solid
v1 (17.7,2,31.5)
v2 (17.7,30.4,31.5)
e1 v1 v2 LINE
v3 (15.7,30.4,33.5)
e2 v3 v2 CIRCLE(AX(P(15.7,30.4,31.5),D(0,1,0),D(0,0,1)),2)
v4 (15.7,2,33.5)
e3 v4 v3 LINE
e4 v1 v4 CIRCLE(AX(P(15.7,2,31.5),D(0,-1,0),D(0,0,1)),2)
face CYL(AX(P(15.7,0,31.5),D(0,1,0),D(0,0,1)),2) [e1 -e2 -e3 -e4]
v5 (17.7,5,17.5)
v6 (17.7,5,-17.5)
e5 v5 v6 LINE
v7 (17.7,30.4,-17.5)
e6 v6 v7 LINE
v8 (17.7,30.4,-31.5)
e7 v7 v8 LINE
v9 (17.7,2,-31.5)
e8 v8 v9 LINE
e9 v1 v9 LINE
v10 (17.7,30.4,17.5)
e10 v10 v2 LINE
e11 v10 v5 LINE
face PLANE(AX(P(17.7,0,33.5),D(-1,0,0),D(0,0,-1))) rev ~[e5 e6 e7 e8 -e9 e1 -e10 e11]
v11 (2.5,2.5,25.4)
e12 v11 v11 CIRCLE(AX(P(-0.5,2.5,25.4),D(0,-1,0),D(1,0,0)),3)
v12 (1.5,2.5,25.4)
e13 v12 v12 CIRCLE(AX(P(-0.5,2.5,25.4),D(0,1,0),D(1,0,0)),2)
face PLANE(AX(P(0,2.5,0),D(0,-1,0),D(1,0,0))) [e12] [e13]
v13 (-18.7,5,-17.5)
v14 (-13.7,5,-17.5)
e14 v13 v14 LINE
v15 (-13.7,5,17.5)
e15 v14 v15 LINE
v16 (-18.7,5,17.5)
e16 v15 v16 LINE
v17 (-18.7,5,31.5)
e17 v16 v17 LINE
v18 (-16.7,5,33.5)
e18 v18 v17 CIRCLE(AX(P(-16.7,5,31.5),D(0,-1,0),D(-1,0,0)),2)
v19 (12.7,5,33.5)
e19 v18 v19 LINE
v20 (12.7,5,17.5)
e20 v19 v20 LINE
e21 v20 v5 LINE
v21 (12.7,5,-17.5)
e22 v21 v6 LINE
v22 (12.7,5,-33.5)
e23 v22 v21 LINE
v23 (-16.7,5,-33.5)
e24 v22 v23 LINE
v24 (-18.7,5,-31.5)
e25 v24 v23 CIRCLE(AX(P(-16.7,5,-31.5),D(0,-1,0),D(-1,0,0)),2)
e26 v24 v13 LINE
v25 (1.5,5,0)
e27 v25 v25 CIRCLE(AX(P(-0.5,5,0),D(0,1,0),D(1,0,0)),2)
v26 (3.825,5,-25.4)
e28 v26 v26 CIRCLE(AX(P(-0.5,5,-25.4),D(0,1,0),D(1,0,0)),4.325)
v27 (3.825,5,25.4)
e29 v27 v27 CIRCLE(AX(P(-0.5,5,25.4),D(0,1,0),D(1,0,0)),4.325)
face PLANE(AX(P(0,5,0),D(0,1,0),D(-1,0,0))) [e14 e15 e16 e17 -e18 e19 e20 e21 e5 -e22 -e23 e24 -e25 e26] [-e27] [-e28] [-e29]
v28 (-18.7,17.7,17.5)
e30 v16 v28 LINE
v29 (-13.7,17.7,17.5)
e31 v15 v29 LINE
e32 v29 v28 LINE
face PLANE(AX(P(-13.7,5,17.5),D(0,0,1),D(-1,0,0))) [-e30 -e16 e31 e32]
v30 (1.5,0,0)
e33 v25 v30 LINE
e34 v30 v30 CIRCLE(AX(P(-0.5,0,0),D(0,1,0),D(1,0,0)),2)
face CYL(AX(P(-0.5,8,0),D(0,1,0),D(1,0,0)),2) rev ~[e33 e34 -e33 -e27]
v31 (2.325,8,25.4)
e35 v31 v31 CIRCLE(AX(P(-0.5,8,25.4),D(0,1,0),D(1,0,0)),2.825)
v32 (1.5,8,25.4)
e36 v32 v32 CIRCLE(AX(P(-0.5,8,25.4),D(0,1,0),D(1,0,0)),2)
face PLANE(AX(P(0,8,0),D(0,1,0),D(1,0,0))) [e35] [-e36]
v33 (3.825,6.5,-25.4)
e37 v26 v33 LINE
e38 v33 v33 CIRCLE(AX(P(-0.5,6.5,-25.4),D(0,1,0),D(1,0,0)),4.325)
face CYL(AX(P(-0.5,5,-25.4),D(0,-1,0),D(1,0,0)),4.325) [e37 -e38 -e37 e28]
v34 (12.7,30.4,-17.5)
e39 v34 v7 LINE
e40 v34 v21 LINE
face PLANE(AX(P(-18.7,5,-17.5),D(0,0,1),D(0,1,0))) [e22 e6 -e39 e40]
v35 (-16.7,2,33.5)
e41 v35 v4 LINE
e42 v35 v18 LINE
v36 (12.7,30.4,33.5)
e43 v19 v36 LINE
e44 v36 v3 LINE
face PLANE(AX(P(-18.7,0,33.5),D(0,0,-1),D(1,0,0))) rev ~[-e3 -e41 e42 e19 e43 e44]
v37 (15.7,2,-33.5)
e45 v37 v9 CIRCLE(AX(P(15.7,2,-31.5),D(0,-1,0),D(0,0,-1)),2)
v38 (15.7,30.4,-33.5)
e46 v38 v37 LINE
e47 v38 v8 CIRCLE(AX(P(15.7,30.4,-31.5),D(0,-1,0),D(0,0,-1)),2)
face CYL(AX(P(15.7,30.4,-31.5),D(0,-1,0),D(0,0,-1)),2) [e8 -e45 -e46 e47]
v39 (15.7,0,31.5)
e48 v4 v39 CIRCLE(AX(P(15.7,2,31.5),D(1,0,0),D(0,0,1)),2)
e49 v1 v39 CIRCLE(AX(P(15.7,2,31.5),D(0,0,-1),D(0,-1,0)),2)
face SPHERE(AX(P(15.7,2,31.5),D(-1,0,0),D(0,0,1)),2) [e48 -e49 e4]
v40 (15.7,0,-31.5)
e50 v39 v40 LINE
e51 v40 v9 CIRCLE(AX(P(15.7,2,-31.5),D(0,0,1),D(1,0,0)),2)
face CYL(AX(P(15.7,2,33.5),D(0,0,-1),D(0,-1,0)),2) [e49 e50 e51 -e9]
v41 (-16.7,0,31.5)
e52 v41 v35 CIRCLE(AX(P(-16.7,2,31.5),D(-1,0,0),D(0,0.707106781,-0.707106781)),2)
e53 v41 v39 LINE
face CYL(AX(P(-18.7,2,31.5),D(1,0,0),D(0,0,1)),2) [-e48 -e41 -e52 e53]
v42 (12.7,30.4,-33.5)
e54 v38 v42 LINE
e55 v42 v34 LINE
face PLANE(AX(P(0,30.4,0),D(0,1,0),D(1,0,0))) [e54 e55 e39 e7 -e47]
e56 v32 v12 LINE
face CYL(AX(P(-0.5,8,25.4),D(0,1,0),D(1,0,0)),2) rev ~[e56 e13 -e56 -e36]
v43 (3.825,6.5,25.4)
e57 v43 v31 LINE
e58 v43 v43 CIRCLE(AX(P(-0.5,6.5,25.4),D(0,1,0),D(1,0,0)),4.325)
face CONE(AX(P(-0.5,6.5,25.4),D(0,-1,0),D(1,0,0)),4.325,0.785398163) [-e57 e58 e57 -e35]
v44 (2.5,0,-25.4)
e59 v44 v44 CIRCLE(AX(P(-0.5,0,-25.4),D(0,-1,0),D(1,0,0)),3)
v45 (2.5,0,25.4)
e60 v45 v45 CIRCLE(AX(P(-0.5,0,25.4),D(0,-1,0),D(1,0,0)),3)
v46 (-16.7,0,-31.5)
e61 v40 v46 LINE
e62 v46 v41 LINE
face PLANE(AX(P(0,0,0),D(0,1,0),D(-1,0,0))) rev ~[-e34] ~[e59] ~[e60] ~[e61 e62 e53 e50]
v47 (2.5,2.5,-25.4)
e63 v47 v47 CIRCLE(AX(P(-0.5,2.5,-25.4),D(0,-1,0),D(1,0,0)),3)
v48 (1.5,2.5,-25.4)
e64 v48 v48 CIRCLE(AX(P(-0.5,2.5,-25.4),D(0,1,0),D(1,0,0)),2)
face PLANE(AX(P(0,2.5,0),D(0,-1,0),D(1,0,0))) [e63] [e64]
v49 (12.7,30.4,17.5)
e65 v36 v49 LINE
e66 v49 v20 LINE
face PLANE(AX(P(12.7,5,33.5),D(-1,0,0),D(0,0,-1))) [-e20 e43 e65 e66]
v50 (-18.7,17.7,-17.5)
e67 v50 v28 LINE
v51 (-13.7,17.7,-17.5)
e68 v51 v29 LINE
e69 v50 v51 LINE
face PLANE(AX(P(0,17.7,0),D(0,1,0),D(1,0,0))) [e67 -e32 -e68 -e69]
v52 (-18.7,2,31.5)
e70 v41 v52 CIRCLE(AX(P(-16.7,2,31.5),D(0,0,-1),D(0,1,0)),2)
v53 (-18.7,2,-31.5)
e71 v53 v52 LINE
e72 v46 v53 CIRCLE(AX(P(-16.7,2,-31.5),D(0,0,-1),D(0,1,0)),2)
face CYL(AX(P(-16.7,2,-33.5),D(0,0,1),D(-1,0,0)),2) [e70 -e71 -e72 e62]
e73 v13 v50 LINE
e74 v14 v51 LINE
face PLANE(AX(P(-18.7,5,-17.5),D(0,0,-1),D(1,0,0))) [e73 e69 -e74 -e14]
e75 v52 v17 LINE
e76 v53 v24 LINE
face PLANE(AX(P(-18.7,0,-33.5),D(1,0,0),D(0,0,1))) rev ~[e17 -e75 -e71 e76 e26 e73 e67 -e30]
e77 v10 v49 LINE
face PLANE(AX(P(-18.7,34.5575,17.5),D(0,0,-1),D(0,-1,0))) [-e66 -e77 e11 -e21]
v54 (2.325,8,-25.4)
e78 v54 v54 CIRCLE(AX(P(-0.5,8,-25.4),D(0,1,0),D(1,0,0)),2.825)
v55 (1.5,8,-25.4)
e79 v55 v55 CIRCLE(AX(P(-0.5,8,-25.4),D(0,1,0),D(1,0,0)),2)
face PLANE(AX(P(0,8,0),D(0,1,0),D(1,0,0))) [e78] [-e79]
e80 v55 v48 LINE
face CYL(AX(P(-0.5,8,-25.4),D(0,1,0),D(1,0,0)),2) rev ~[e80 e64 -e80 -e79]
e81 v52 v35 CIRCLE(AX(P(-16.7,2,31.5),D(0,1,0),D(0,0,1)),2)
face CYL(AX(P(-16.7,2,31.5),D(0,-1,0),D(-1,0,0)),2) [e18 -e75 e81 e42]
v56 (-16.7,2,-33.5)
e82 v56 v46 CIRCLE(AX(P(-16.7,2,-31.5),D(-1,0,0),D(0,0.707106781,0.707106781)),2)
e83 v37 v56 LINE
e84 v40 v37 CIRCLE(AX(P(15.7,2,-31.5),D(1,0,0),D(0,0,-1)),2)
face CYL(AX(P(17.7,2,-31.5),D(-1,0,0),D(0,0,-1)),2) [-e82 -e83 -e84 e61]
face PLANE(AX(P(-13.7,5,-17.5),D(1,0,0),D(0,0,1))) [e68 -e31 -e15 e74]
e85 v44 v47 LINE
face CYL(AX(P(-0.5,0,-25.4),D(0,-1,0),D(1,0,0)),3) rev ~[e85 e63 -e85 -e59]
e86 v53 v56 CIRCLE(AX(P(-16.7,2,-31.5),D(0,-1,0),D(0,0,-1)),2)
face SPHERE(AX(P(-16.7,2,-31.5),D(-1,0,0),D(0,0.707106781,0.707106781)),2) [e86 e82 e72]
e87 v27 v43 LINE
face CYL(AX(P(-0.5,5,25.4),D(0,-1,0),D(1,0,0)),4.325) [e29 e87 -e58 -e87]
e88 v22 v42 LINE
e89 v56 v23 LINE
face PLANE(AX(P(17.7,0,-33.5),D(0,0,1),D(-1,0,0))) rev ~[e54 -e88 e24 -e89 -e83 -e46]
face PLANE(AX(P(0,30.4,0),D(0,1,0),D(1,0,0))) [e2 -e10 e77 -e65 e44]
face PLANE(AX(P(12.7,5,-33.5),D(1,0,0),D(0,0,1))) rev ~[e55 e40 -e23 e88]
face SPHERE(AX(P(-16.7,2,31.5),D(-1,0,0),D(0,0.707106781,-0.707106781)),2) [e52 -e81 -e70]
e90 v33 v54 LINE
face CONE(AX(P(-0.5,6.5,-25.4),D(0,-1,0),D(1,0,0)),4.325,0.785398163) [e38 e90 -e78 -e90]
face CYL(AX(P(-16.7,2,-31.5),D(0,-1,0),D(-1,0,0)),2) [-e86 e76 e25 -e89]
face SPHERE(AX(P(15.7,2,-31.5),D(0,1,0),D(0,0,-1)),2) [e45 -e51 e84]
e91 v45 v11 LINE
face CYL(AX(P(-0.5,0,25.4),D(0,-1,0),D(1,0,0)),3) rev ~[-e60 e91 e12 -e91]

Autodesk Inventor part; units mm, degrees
ref_plane "YZ Plane" through (0, 0, 0) normal (1, 0, 0) x (0, 1, 0)
ref_plane "XZ Plane" through (0, 0, 0) normal (0, 1, 0) x (-1, 0, 0)
ref_plane "XY Plane" through (0, 0, 0) normal (0, 0, 1) x (1, 0, 0)
sketch "Sketch1" plane through (0, 0, 0) normal (0, 1, 0) x (-1, 0, 0)
  line L0 (18.7, 33.5) -> (-17.7, 33.5)
  line L1 (-17.7, 33.5) -> (-17.7, -33.5)
  line L2 (-17.7, -33.5) -> (18.7, -33.5)
  line L3 (18.7, -33.5) -> (18.7, 33.5)
  point P0 (0, 0)
  dimension "d0" = 36.4
  dimension "d1" = 67
extrude "Extrusion1" add sketch "Sketch1" along normal blind 5
sketch "Sketch2" plane through (0, 5, 0) normal (0, 1, 0) x (1, 0, 0)
  line L0 (-18.7, -33.5) -> (17.7, -33.5) projected
  line L1 (17.7, -33.5) -> (12.7, -33.5)
  line L2 (12.7, -33.5) -> (12.7, -12.5)
  line L3 (12.7, -12.5) -> (17.7, -12.5)
  line L4 (17.7, -12.5) -> (17.7, -33.5)
  line L5 (17.7, -33.5) -> (17.7, 33.5) projected
  line L6 (17.7, 33.5) -> (12.7, 33.5)
  line L7 (12.7, 33.5) -> (12.7, 12.5)
  line L8 (12.7, 12.5) -> (17.7, 12.5)
  line L9 (17.7, 12.5) -> (17.7, 33.5)
  point P0 (0, 0)
  dimension "d4" = 5
  dimension "d5" = 21
  dimension "d6" = 5
  dimension "d7" = 21
extrude "Extrusion2" add sketch "Sketch2" along normal blind 25.4
fillet "Fillet2" radius 2 6 edges at (-0.5, 0, 33.5) (-18.7, 0, 0) (17.7, 15.2, 33.5) (17.7, 15.2, -33.5) (-0.5, 0, -33.5) (17.7, 0, 0)
sketch "Sketch6" plane through (0, 5, 0) normal (0, 1, 0) x (1, 0, 0)
  line L0 (-18.7, -33.5) -> (-18.7, 33.5) projected
  line L1 (-18.7, 12) -> (-13.7, 12)
  line L2 (-13.7, 12) -> (-13.7, -12)
  line L3 (-13.7, -12) -> (-18.7, -12)
  line L4 (-18.7, -12) -> (-18.7, 12)
  point P0 (0, 0)
  point P1 (-18.7, -12)
  dimension "d26" = 5
  dimension "d27" = 24
extrude "Extrusion6" add sketch "Sketch6" along normal blind 25.4
fillet "Fillet3" radius 2 4 edges at (-18.1142, 0.5858, 32.9142) (-18.7, 3.5, 33.5) (-18.1142, 0.5858, -32.9142) (-18.7, 3.5, -33.5)
sketch "Sketch8" plane through (0, 5, 0) normal (0, 1, 0) x (1, 0, 0)
  circle A0 centre (-0.5, 0) radius 4.325
  circle A1 centre (-0.5, -25.4) radius 4.325
  circle A2 centre (-0.5, 25.4) radius 4.325
  point P0 (0, 0)
  dimension "d37" = 8.65
  dimension "d38" = 8.65
  dimension "d39" = 8.65
extrude "Extrusion8" add sketch "Sketch8" along normal blind 3 contours A1 | A2
chamfer "Chamfer1" distance 1.5 angle 45 2 edges at (-4.825, 8, -25.4) (-4.825, 8, 25.4)
sketch "Sketch9" plane through (-0.5, 8, 0) normal (0, 1, 0) x (1, 0, 0)
  circle A0 centre (0, 0) radius 2.825 projected
  circle A1 centre (0, 0) radius 2
  circle A2 centre (0, 25.4) radius 2.825 projected
  circle A3 centre (0, 25.4) radius 2
  circle A4 centre (0, -25.4) radius 2.825 projected
  circle A5 centre (0, -25.4) radius 2
  point P0 (0.5, 0)
  dimension "d45" = 4
  dimension "d46" = 4
  dimension "d47" = 4
extrude "Extrusion9" cut sketch "Sketch9" against normal blind 20 contours A1 | A3 | A5
sketch "Sketch10" plane through (0, 0, 0) normal (0, -1, 0) x (1, 0, 0)
  circle A0 centre (-0.5, -25.4) radius 2.825 projected
  circle A1 centre (-0.5, -25.4) radius 3
  circle A2 centre (-0.5, 0) radius 4.325 projected
  circle A3 centre (-0.5, 0) radius 3
  circle A4 centre (-0.5, 25.4) radius 2.825 projected
  circle A5 centre (-0.5, 25.4) radius 3
  point P0 (0, 0)
  dimension "d50" = 6
  dimension "d51" = 6
  dimension "d52" = 6
extrude "Extrusion10" cut sketch "Sketch10" against normal blind 2.5 contours A0 | A1 | A4 | A5
sketch "Sketch11" plane through (-18.7, 5, 12) normal (-1, 0, 0) x (0, 0, 1)
  line L0 (21.5, 0) -> (0.5, 0) projected
  line L1 (-29.5, 29.5575) -> (5.5, 29.5575)
  line L2 (5.5, 29.5575) -> (5.5, 0)
  line L3 (5.5, 0) -> (-29.5, 0)
  line L4 (-29.5, 0) -> (-29.5, 29.5575)
  point P0 (-12, -5)
  dimension "d55" = 35
extrude "Extrusion11" cut sketch "Sketch11" against normal blind 50
sketch "Sketch12" plane through (0, 5, 0) normal (0, 1, 0) x (1, 0, 0)
  line L0 (-18.7, 31.5) -> (-18.7, -31.5) projected
  line L1 (-18.7, 17.5) -> (-13.7, 17.5)
  line L2 (-13.7, 17.5) -> (-13.7, -17.5)
  line L3 (-13.7, -17.5) -> (-18.7, -17.5)
  line L4 (-18.7, -17.5) -> (-18.7, 17.5)
  point P0 (0, 0)
  dimension "d58" = 5
extrude "Extrusion12" add sketch "Sketch12" along normal blind 12.7
properties part number "bigSpringBedMount"
